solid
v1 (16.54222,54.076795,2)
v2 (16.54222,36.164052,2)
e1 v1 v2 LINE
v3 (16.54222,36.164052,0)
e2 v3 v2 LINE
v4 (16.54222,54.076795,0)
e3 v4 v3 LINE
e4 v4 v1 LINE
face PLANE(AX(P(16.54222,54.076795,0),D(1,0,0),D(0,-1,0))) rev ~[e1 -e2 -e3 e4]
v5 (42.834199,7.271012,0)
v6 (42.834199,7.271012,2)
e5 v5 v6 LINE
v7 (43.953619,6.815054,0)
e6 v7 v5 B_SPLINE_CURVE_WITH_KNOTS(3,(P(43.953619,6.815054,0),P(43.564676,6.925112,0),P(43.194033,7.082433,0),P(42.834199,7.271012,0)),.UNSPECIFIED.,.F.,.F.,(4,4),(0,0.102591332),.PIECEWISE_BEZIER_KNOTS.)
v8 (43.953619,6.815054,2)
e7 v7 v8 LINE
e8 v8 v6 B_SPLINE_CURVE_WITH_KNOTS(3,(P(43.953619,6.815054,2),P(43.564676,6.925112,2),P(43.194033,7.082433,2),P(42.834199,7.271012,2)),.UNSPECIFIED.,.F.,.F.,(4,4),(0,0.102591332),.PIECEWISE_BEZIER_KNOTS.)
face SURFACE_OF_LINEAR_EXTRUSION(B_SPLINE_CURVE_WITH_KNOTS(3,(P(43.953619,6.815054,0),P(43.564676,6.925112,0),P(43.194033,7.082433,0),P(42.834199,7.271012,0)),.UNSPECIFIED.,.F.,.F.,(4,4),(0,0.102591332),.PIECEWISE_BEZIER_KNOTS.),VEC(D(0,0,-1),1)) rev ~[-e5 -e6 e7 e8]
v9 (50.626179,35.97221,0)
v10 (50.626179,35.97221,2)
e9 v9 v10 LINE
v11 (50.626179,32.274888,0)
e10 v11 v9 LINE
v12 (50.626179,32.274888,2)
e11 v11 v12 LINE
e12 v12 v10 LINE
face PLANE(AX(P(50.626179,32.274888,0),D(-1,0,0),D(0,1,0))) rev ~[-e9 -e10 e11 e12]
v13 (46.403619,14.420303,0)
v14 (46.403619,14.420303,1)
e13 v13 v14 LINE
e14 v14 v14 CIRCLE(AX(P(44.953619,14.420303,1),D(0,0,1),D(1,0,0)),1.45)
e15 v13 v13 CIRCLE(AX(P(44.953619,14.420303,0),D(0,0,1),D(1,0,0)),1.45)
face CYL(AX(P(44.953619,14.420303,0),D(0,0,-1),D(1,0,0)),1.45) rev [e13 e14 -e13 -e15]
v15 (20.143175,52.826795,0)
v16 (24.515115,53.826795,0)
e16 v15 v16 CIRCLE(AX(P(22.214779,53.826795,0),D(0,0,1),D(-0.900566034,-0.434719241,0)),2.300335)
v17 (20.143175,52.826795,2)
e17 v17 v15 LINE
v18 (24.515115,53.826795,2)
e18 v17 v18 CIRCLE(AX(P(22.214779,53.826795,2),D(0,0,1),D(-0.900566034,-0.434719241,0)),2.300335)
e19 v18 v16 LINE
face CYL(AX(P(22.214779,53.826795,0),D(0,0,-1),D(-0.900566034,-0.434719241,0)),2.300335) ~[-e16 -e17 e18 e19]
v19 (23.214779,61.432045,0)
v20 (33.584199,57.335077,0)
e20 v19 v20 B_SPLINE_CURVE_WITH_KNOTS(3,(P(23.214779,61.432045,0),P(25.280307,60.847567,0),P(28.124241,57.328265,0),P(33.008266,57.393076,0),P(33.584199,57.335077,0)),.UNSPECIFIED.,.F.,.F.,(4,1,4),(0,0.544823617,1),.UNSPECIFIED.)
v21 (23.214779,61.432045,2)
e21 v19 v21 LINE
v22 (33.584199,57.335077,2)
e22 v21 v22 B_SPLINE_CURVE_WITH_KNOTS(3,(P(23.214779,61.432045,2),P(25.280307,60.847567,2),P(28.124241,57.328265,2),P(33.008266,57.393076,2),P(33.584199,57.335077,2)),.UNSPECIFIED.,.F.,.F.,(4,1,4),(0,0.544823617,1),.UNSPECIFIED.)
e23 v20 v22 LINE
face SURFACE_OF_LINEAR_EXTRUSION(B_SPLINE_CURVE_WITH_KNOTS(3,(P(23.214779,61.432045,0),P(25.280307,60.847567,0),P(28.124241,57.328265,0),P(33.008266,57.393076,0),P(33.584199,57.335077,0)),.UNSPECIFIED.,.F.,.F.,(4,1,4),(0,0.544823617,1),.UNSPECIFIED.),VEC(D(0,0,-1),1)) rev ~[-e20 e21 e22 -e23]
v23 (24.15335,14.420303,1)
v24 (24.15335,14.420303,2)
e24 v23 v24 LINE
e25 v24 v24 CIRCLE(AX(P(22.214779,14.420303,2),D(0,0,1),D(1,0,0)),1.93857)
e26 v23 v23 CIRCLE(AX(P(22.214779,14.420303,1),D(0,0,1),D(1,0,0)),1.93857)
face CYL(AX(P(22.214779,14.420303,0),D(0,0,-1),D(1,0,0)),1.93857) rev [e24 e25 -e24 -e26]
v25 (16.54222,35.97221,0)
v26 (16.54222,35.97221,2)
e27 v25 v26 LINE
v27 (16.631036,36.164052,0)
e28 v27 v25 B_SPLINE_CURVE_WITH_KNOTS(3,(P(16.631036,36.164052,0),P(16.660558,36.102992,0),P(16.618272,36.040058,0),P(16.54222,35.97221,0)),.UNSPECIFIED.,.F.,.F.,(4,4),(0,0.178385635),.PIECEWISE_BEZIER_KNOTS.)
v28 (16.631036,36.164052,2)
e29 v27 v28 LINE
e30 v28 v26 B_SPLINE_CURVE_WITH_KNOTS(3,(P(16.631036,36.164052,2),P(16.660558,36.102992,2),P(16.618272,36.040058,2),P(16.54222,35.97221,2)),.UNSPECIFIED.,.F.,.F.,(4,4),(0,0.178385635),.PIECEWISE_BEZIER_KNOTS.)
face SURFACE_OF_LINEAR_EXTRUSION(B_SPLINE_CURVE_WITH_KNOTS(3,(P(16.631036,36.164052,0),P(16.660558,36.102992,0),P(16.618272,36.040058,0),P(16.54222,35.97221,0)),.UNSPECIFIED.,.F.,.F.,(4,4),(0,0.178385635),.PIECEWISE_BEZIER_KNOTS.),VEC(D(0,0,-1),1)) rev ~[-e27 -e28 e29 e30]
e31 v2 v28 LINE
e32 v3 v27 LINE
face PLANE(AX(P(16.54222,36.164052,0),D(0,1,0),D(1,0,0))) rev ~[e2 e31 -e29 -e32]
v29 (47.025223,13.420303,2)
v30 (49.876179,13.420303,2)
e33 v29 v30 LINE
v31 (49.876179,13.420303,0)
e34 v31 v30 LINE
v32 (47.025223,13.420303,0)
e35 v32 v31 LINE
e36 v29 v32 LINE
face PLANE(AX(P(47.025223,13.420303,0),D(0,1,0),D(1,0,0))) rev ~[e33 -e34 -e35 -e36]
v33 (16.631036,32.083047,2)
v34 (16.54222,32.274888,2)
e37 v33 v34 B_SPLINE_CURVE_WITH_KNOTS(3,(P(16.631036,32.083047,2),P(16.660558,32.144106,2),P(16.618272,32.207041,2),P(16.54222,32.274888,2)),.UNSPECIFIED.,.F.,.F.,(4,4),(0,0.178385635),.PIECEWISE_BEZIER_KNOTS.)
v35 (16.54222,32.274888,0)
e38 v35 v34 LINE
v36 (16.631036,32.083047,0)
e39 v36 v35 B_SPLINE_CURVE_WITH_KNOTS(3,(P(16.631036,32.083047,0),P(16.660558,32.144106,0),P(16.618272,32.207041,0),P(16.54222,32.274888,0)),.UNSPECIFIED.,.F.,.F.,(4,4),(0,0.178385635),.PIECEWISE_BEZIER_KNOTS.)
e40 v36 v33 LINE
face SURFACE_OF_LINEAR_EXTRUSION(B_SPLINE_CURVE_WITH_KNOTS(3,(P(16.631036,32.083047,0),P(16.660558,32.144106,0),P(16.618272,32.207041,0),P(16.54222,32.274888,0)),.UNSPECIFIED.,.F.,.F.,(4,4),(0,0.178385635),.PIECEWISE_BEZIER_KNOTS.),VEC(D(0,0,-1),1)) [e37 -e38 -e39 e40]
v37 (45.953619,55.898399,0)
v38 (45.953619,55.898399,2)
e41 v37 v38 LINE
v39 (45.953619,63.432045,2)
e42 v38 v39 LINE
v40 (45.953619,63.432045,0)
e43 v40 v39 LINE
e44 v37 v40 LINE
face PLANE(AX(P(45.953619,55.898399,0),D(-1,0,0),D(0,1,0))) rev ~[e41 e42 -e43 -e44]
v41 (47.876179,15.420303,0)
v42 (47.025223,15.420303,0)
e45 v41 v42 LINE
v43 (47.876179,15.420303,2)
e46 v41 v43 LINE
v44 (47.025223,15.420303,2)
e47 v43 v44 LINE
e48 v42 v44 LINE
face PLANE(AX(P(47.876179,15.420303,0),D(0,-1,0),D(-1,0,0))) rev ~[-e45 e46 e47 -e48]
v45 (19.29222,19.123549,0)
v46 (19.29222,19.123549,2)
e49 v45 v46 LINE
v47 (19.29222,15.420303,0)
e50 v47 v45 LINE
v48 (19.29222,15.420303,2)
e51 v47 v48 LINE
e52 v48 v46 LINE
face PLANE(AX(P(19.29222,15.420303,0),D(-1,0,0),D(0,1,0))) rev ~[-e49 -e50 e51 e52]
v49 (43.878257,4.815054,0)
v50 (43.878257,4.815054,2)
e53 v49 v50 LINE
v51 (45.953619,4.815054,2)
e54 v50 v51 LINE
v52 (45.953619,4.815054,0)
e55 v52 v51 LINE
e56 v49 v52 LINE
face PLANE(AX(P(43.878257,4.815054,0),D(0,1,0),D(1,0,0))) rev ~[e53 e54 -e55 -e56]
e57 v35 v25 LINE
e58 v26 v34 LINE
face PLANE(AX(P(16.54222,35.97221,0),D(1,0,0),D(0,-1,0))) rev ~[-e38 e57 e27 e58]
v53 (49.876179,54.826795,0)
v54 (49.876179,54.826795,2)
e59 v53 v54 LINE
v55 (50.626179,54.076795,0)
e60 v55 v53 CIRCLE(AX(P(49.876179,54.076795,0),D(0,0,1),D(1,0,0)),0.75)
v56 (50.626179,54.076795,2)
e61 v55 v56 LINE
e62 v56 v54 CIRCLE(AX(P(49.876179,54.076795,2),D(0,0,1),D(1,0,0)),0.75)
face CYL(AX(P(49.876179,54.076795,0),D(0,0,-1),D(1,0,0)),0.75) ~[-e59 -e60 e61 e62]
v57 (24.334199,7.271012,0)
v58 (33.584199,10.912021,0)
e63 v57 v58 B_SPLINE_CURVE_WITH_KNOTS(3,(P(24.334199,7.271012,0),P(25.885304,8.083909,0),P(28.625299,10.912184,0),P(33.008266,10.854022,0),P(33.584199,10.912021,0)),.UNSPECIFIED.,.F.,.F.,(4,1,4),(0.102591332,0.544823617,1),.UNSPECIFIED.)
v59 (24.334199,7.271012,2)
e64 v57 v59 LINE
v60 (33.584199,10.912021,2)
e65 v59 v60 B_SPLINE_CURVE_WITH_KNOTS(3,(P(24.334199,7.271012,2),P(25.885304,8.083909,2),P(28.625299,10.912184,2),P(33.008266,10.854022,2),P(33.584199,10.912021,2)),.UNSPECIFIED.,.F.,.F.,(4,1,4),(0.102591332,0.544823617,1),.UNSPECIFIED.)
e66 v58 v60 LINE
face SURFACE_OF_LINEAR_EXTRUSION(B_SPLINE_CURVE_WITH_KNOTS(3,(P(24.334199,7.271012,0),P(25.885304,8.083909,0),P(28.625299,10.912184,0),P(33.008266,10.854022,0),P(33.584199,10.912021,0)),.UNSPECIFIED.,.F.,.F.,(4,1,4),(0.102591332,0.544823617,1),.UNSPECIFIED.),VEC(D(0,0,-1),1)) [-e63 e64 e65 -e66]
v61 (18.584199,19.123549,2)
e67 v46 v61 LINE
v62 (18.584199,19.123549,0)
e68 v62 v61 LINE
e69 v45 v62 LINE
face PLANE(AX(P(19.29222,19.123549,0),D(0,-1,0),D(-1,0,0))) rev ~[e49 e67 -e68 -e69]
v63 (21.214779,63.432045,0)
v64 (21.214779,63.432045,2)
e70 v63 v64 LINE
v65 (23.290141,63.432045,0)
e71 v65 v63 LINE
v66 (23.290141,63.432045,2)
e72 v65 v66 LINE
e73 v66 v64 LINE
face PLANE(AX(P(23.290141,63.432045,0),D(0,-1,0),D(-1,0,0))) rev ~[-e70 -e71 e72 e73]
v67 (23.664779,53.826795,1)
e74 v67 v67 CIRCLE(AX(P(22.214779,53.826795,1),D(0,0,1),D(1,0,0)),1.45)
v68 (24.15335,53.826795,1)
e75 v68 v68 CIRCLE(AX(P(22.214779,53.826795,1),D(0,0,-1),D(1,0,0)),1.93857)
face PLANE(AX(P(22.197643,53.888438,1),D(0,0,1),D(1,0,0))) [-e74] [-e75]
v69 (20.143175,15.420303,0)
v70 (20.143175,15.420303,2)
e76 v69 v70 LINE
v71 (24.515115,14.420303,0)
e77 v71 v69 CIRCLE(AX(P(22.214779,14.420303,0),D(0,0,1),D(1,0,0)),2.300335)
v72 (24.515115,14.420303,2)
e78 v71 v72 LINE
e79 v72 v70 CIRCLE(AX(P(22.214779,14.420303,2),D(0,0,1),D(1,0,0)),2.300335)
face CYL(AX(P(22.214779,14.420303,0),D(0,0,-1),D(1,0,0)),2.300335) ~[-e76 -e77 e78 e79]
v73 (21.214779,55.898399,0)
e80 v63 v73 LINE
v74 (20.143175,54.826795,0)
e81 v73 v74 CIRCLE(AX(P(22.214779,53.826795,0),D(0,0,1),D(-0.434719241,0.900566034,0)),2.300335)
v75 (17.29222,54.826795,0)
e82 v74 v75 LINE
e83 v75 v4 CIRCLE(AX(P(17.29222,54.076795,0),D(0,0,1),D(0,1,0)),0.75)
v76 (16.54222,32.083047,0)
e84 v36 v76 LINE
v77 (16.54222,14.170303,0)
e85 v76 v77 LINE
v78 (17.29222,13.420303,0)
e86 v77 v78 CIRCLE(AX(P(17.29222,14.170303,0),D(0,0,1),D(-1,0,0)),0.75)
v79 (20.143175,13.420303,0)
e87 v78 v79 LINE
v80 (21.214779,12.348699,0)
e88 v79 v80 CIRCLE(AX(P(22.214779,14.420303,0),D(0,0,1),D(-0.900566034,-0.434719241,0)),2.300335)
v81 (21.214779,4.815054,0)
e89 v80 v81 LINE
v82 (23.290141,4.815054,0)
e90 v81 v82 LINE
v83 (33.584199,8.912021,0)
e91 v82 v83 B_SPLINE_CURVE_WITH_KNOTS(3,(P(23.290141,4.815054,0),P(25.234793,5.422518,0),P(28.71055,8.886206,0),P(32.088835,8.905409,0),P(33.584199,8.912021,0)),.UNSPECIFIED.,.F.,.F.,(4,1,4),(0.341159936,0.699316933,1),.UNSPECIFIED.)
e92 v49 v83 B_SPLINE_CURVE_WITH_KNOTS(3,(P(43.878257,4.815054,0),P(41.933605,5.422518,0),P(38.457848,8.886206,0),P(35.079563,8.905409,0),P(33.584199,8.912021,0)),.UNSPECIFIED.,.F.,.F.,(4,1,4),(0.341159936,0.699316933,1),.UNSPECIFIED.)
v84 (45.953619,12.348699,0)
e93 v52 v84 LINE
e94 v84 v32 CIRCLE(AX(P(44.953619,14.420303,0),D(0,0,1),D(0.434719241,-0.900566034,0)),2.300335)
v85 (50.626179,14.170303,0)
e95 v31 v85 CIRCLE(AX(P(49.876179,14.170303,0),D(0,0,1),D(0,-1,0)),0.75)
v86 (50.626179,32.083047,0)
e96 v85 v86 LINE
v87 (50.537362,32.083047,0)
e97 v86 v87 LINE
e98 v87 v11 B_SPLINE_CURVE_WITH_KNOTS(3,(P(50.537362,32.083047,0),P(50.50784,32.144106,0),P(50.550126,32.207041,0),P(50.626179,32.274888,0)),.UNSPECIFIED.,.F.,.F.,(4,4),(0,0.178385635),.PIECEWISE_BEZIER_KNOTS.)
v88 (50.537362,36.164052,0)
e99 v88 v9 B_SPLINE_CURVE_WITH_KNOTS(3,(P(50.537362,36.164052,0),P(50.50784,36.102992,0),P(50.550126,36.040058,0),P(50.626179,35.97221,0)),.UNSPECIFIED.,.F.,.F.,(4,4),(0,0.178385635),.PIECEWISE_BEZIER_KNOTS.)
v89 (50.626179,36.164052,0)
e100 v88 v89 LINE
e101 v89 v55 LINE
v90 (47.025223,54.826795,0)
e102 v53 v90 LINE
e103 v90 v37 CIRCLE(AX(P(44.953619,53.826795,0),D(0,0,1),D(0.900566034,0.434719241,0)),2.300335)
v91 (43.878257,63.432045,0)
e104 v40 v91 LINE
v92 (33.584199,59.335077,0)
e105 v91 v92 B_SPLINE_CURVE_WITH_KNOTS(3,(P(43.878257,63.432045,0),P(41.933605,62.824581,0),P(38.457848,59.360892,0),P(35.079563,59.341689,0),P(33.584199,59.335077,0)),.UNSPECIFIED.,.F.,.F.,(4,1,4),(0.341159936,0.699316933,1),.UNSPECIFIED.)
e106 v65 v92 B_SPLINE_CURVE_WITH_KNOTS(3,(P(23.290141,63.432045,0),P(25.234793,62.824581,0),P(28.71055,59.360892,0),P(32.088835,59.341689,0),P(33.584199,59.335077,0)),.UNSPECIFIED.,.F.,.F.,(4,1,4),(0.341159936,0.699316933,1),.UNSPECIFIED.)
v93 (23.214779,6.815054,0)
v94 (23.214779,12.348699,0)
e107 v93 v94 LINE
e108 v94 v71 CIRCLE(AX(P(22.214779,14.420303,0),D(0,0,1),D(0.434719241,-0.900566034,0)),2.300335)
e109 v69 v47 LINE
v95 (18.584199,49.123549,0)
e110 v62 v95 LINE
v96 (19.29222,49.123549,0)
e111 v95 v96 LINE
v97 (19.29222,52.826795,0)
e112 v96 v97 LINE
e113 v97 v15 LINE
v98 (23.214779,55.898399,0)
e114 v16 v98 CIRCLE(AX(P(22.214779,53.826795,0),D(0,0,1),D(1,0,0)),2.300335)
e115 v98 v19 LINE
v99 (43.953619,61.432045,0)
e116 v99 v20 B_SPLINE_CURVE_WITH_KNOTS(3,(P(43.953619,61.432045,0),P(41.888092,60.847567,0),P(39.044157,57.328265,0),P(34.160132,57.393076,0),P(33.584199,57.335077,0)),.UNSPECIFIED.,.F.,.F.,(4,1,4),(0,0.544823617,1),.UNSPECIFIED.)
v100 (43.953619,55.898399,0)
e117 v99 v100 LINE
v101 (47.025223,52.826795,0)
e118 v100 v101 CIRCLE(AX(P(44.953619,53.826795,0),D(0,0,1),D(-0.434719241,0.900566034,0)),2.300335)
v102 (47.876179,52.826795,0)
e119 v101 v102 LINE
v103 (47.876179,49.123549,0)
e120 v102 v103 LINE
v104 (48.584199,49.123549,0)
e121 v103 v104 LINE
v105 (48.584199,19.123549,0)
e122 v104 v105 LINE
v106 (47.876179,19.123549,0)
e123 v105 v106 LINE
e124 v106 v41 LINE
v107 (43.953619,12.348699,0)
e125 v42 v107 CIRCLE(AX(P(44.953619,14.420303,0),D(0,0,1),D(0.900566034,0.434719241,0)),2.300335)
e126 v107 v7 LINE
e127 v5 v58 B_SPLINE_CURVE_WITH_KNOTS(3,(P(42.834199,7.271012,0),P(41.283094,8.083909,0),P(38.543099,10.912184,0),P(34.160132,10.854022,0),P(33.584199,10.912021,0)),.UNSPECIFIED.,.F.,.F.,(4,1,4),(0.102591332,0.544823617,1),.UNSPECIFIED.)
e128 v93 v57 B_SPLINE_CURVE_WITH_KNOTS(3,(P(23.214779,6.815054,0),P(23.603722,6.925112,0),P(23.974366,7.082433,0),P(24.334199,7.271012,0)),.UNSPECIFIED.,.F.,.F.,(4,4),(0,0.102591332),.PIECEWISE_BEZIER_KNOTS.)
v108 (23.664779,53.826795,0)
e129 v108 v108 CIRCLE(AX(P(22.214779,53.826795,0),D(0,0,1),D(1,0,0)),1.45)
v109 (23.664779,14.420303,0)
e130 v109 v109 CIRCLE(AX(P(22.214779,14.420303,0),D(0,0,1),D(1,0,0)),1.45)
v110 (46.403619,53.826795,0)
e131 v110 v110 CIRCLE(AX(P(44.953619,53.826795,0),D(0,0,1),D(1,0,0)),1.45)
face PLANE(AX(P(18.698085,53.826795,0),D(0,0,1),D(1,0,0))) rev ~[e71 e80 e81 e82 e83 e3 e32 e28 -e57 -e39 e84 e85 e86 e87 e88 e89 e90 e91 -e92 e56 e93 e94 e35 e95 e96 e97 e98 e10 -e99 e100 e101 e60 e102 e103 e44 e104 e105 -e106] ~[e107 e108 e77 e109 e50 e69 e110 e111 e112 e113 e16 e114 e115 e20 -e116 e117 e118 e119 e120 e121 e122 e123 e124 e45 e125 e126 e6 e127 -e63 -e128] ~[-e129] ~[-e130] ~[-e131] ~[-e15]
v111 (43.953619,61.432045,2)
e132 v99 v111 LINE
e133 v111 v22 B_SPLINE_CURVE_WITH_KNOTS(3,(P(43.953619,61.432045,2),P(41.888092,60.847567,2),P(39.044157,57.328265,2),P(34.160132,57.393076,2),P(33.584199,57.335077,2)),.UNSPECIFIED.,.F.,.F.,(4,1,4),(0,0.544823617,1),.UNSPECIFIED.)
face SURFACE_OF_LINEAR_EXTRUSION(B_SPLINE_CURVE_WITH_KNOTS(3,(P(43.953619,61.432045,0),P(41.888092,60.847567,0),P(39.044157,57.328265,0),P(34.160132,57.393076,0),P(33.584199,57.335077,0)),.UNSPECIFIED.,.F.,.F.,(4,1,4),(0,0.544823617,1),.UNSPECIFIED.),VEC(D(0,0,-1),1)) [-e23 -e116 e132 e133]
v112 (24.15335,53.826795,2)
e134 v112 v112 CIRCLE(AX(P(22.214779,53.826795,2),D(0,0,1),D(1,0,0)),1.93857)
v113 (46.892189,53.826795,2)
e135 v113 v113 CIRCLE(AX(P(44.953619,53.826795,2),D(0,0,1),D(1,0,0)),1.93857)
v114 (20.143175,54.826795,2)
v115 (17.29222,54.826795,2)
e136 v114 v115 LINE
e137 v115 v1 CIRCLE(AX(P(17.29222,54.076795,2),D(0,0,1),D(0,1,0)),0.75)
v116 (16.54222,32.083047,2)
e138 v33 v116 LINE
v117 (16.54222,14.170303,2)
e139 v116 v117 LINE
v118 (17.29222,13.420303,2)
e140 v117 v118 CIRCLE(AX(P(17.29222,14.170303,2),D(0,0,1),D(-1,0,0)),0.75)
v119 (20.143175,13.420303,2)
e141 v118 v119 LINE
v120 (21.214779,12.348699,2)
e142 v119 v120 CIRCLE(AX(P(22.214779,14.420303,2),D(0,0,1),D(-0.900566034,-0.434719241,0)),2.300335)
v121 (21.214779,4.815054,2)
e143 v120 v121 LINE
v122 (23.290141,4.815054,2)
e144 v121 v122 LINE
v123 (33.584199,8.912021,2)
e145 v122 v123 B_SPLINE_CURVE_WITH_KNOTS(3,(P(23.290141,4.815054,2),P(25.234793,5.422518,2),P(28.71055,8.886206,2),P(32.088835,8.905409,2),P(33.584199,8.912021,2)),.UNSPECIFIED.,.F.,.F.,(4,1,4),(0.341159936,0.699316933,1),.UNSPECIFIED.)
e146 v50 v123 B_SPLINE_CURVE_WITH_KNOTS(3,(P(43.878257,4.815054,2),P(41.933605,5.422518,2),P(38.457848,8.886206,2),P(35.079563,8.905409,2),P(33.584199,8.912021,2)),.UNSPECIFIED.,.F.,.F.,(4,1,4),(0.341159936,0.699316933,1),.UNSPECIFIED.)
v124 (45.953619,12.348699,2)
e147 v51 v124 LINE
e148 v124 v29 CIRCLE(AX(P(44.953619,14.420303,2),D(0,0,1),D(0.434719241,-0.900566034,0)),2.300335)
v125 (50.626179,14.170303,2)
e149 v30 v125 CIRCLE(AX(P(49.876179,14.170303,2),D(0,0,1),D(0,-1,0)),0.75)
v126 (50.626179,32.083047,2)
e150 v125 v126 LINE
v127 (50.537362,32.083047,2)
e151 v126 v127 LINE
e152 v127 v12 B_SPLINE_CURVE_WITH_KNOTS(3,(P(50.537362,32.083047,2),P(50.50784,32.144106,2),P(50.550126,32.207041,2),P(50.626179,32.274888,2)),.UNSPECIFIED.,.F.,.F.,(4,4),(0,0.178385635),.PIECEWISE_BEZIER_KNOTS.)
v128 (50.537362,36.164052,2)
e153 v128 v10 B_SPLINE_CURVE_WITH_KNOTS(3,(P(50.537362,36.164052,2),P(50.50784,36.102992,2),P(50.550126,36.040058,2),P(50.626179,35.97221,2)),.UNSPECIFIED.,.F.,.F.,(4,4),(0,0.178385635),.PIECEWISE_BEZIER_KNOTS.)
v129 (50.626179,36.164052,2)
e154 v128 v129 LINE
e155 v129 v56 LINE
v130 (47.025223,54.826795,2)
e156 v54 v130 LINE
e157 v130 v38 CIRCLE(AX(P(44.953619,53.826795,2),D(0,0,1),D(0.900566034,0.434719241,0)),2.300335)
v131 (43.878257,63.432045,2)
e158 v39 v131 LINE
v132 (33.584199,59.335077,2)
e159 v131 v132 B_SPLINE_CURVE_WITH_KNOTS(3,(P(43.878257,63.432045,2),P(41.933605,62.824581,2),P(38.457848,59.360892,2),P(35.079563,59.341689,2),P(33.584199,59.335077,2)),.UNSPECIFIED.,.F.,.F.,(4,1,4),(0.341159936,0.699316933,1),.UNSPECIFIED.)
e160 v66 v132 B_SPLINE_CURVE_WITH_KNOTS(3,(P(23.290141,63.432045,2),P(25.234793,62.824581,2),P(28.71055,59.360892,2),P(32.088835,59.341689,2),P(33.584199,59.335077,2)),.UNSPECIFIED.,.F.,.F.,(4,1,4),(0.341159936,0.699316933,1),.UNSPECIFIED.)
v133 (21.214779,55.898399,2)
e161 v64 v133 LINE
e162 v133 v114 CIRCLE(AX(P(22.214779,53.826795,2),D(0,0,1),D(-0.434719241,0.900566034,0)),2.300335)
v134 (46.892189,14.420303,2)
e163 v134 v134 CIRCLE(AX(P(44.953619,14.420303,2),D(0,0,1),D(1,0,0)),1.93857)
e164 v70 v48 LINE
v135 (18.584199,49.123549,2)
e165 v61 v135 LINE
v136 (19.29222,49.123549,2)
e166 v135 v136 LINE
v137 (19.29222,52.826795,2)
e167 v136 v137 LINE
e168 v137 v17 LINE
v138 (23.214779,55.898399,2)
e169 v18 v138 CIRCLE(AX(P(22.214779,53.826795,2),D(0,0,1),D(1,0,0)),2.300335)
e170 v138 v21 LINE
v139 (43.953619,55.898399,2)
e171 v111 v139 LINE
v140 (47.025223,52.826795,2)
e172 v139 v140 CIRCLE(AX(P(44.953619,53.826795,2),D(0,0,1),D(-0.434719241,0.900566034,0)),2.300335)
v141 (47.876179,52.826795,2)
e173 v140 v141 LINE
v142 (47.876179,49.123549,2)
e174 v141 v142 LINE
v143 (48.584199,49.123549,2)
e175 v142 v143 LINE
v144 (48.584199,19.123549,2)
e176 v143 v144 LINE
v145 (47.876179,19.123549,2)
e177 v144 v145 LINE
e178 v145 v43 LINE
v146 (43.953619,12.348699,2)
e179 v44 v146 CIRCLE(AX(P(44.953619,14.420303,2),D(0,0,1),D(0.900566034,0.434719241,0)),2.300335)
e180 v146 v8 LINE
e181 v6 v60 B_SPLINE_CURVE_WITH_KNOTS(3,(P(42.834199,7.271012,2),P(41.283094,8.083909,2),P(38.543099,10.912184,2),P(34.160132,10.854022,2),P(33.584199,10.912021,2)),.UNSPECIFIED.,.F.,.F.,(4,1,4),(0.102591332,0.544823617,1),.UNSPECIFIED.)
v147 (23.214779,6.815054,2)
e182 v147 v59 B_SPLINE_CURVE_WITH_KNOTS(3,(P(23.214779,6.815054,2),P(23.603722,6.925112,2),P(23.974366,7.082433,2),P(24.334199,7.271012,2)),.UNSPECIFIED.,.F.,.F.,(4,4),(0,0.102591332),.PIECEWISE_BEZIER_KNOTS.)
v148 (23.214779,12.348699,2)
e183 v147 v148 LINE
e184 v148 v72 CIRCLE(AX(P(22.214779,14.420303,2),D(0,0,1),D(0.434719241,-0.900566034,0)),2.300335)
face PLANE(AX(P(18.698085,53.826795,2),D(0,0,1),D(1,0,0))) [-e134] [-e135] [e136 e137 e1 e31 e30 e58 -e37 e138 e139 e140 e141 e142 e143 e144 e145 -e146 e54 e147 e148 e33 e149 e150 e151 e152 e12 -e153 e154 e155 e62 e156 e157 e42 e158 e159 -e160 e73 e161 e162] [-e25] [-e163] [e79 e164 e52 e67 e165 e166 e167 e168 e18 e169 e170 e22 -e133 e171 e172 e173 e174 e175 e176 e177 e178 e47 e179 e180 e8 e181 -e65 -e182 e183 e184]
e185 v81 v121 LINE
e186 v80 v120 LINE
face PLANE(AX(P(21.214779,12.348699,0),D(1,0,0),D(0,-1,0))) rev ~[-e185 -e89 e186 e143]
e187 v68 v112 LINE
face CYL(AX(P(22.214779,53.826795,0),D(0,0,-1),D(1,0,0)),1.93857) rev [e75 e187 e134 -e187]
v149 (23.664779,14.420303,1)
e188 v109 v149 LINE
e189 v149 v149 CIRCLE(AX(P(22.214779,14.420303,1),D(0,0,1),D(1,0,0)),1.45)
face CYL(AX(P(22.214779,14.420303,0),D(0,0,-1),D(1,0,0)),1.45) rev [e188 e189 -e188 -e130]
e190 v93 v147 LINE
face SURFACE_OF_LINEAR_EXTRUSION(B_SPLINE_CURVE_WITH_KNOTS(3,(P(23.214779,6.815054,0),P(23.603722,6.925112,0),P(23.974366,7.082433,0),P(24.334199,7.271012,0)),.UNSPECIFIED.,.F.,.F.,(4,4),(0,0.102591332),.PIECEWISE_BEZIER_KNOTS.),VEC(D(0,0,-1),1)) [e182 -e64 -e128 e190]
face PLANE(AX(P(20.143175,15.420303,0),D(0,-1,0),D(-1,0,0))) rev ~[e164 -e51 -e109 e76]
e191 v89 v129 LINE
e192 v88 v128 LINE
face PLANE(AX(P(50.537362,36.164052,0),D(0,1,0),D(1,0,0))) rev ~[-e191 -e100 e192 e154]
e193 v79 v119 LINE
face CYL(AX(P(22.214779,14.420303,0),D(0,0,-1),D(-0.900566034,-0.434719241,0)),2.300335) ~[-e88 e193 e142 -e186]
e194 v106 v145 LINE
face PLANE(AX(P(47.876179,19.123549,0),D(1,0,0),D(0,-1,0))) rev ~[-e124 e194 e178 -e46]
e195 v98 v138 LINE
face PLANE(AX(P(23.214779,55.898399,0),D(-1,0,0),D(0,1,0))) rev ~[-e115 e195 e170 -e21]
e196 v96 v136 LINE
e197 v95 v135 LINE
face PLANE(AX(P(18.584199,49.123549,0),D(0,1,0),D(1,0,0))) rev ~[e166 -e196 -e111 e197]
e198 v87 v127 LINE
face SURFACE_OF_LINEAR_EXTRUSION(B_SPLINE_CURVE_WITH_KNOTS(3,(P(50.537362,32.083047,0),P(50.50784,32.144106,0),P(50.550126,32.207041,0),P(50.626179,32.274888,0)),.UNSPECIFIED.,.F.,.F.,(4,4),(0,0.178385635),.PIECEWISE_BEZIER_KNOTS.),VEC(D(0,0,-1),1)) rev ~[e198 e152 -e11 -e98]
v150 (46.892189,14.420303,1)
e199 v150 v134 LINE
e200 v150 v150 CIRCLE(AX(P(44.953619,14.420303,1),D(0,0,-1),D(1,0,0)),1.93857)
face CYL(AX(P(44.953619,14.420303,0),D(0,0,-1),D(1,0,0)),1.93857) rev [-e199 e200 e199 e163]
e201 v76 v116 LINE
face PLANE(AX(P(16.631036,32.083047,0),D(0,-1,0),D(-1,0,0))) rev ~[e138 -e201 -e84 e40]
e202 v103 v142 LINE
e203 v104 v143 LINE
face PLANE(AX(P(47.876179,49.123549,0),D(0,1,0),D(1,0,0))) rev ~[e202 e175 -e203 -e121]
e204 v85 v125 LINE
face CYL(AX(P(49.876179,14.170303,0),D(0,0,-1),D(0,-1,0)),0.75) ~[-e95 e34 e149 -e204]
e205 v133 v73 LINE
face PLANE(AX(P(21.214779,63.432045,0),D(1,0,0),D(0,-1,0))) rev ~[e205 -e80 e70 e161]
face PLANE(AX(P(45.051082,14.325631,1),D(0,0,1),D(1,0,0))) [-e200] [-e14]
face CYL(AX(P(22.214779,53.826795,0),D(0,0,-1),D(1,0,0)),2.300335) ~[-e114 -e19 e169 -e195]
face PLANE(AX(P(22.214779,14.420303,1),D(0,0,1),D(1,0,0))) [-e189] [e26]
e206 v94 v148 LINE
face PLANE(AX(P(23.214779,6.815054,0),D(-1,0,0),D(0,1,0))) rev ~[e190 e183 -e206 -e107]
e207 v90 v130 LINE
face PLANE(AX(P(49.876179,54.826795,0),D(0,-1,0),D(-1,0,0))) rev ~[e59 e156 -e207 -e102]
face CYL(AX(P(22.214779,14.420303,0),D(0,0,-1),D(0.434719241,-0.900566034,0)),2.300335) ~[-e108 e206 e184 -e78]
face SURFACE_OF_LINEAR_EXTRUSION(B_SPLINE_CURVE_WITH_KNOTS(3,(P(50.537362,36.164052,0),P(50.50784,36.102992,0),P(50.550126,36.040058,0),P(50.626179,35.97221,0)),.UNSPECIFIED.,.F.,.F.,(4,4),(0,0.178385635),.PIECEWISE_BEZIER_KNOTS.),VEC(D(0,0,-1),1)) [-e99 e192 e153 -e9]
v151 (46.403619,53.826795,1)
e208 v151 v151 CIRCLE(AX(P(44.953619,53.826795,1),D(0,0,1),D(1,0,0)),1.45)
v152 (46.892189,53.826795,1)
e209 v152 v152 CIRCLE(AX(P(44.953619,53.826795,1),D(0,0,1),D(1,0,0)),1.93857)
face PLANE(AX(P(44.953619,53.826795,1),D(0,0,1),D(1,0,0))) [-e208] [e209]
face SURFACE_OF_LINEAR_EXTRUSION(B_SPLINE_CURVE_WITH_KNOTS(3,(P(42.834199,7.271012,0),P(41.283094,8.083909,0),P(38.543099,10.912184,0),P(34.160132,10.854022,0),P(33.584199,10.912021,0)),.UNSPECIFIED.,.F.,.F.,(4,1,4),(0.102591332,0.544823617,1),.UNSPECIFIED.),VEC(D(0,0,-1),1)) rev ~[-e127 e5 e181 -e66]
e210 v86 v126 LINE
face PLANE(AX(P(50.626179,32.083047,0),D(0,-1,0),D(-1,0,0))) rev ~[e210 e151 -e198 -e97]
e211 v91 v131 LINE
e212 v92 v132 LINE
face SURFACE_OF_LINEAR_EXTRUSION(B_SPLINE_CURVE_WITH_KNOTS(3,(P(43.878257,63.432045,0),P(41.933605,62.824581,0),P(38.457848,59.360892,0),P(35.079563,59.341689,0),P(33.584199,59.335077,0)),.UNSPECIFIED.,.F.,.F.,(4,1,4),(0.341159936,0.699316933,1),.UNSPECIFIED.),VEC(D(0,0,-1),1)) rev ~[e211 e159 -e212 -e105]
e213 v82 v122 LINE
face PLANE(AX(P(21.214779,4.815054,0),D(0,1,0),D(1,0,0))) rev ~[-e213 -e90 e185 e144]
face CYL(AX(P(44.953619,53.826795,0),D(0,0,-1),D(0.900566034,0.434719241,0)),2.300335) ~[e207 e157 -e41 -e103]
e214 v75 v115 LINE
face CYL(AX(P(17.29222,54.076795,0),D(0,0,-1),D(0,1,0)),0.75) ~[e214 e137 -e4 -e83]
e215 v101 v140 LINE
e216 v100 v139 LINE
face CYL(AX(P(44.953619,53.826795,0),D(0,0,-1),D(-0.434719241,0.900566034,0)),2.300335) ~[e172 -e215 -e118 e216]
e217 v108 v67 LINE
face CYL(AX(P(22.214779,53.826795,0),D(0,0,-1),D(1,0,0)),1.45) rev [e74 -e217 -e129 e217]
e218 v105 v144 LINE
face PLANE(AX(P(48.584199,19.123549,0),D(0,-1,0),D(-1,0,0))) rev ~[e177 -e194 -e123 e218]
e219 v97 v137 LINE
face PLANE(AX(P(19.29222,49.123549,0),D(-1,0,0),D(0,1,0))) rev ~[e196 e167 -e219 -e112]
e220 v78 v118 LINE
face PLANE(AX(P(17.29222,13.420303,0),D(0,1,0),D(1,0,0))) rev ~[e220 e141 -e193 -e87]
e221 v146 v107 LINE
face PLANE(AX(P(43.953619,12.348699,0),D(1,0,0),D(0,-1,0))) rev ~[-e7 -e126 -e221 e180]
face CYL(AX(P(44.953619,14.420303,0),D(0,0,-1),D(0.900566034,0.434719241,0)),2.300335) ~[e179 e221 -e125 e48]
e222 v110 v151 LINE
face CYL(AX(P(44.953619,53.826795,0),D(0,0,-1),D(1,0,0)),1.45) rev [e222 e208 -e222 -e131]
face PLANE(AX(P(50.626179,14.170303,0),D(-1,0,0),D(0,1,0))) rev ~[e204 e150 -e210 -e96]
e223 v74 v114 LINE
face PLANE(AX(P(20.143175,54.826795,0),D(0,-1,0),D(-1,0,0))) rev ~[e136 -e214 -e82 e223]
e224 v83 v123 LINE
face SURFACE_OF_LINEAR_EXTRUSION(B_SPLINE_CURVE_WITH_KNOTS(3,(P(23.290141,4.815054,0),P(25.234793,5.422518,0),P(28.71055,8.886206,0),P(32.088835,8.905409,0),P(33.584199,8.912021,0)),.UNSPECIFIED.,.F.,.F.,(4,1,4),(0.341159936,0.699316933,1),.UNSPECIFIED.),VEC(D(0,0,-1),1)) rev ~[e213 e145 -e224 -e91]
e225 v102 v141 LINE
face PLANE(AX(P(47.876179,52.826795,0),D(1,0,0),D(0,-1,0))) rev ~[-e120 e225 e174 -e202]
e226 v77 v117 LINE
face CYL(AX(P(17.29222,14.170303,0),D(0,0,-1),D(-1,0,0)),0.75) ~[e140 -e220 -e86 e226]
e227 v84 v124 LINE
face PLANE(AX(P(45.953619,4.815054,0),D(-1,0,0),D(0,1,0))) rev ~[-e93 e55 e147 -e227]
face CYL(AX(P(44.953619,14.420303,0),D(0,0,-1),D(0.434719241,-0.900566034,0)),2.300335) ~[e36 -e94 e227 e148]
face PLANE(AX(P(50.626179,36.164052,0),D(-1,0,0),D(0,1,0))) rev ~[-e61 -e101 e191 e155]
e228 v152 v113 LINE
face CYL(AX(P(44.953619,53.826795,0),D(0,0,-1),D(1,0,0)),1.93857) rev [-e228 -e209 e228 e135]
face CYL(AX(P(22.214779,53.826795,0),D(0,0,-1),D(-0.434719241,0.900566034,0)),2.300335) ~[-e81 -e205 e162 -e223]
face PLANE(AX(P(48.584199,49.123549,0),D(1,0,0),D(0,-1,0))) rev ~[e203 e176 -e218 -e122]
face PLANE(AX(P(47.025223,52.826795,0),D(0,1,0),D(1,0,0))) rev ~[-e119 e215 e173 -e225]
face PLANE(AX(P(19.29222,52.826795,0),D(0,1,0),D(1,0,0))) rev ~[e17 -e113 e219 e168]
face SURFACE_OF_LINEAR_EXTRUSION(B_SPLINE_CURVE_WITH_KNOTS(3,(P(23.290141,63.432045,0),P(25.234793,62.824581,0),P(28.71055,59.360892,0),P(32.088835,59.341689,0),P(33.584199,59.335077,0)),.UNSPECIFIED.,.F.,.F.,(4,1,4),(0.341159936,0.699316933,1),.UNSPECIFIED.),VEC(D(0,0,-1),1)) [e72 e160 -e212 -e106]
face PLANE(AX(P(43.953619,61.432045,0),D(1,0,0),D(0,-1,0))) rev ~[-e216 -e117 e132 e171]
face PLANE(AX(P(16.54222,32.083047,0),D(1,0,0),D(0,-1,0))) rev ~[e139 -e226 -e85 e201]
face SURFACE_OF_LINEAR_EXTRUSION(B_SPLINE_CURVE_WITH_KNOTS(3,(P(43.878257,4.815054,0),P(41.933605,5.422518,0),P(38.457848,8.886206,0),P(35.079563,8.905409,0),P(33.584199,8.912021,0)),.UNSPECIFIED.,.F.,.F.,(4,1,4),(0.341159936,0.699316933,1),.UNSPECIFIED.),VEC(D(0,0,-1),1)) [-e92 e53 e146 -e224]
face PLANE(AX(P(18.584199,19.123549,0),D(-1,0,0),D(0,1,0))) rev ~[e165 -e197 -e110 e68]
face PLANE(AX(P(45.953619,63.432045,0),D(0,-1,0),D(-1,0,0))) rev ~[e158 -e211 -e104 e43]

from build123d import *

# Parameters (mm, degrees)
F1_R     = 1.9385702654
F2_DEPTH = 2
F1_R_2   = 1.45
F3_DEPTH = 1


# Not quite as in the source:
# - a feature names something its author has since deleted; it is built from what else it names


with BuildPart() as f2:
    # F1 (on Top) → F2 (new body)
    with BuildSketch(Plane.XY):
        with BuildLine():
            Line((20.1431754695, 54.826795375), (17.2922195872, 54.826795375))
            Line((17.2922195872, 54.826795375), (17.2922195872, 52.826795375))
            Line((17.2922195872, 52.826795375), (19.2922195872, 52.826795375))
            Line((19.2922195872, 52.826795375), (20.1431754695, 52.826795375))
            ThreePointArc((20.1431754695, 52.826795375), (19.9144440108, 53.826795375), (20.1431754695, 54.826795375))
        make_face()
        with BuildLine():
            Line((17.2922195872, 52.826795375), (17.2922195872, 54.826795375))
            ThreePointArc((17.2922195872, 54.826795375), (16.7618895013, 54.6071254609), (16.5422195872, 54.076795375))
            Line((16.5422195872, 54.076795375), (16.5422195872, 36.1640515577))
            Line((16.5422195872, 36.1640515577), (16.6310362357, 36.1640515577))
            add(Edge.make_bspline(
                [(16.6310362357, 36.1640515577), (16.6605582728, 36.102992123), (16.6182720198, 36.0400576616), (16.5422195872, 35.9722101398)],
                knots=[0, 0, 0, 0, 0.1783856354, 0.1783856354, 0.1783856354, 0.1783856354], degree=3))
            Line((16.5422195872, 35.9722101398), (16.5422195872, 34.8729174655))
            add(Edge.make_bspline(
                [(17.2922195872, 35.0191108741), (17.0997972988, 34.9422994833), (16.8549828965, 34.8916378751), (16.5422195872, 34.8729174655)],
                knots=[0.8658058325, 0.8658058325, 0.8658058325, 0.8658058325, 0.9922819661, 0.9922819661, 0.9922819661, 0.9922819661], degree=3))
            Line((17.2922195872, 35.0191108741), (17.2922195872, 38.9486732266))
            Line((17.2922195872, 38.9486732266), (17.2922195872, 52.826795375))
        make_face()
        with BuildLine():
            add(Edge.make_bspline(
                [(23.2901408764, 63.432044637), (25.2347933568, 62.8245805128), (28.7105504794, 59.3608919111), (32.0888348452, 59.3416892775), (33.5841990847, 59.3350770114)],
                knots=[0.341159936, 0.341159936, 0.341159936, 0.341159936, 0.6993169326, 1, 1, 1, 1], degree=3))
            Line((23.2901408764, 63.432044637), (23.214779273, 63.432044637))
            Line((23.214779273, 63.432044637), (23.214779273, 61.432044637))
            add(Edge.make_bspline(
                [(23.214779273, 61.432044637), (25.2803065411, 60.8475667943), (28.1242407781, 57.3282649057), (33.0082662404, 57.3930760622), (33.5841990847, 57.3350770114)],
                knots=[0, 0, 0, 0, 0.5448236167, 1, 1, 1, 1], degree=3))
            Line((33.5841990847, 57.3350770114), (33.5841990847, 59.3350770114))
        make_face()
        with BuildLine():
            Line((19.2922195872, 52.826795375), (17.2922195872, 52.826795375))
            Line((17.2922195872, 52.826795375), (17.2922195872, 38.9486732266))
            add(Edge.make_bspline(
                [(17.2922195872, 38.9486732266), (17.9578883588, 37.6855991358), (18.2133900062, 36.1544678124), (17.7506952192, 35.2021258003), (17.2922195872, 35.0191108741)],
                knots=[0, 0, 0, 0, 0.5644570346, 0.8658058325, 0.8658058325, 0.8658058325, 0.8658058325], degree=3))
            Line((17.2922195872, 35.0191108741), (17.2922195872, 34.1235491752))
            Line((17.2922195872, 34.1235491752), (18.5841990847, 34.1235491752))
            Line((18.5841990847, 34.1235491752), (18.5841990847, 49.1235491752))
            Line((18.5841990847, 49.1235491752), (19.2922195872, 49.1235491752))
            Line((19.2922195872, 49.1235491752), (19.2922195872, 52.826795375))
        make_face()
        with BuildLine():
            ThreePointArc((21.214779273, 55.8983991785), (20.5881966101, 55.4533780379), (20.1431754695, 54.826795375))
            ThreePointArc((20.1431754695, 54.826795375), (19.9144440108, 53.826795375), (20.1431754695, 52.826795375))
            ThreePointArc((20.1431754695, 52.826795375), (22.7276920531, 51.5843719542), (24.5151145351, 53.826795375))
            ThreePointArc((24.5151145351, 53.826795375), (24.1630961851, 55.0497440772), (23.214779273, 55.8983991785))
            ThreePointArc((23.214779273, 55.8983991785), (22.214779273, 56.1271306372), (21.214779273, 55.8983991785))
        make_face()
        with Locations((22.214779273, 53.826795375)):
            Circle(F1_R, mode=Mode.SUBTRACT)
        with BuildLine():
            Line((23.214779273, 63.432044637), (21.214779273, 63.432044637))
            Line((21.214779273, 63.432044637), (21.214779273, 55.8983991785))
            ThreePointArc((21.214779273, 55.8983991785), (22.214779273, 56.1271306372), (23.214779273, 55.8983991785))
            Line((23.214779273, 55.8983991785), (23.214779273, 61.432044637))
            Line((23.214779273, 61.432044637), (23.214779273, 63.432044637))
        make_face()
        with BuildLine():
            add(Edge.make_bspline(
                [(43.8782572929, 63.432044637), (41.9336048125, 62.8245805128), (38.4578476899, 59.3608919111), (35.0795633241, 59.3416892775), (33.5841990847, 59.3350770114)],
                knots=[0.341159936, 0.341159936, 0.341159936, 0.341159936, 0.6993169326, 1, 1, 1, 1], degree=3))
            Line((33.5841990847, 59.3350770114), (33.5841990847, 57.3350770114))
            add(Edge.make_bspline(
                [(43.9536188964, 61.432044637), (41.8880916283, 60.8475667943), (39.0441573912, 57.3282649057), (34.160131929, 57.3930760622), (33.5841990847, 57.3350770114)],
                knots=[0, 0, 0, 0, 0.5448236167, 1, 1, 1, 1], degree=3))
            Line((43.9536188964, 61.432044637), (43.9536188964, 63.432044637))
            Line((43.9536188964, 63.432044637), (43.8782572929, 63.432044637))
        make_face()
        with BuildLine():
            add(Edge.make_bspline(
                [(17.2922195872, 38.9486732266), (17.9578883588, 37.6855991358), (18.2133900062, 36.1544678124), (17.7506952192, 35.2021258003), (17.2922195872, 35.0191108741)],
                knots=[0, 0, 0, 0, 0.5644570346, 0.8658058325, 0.8658058325, 0.8658058325, 0.8658058325], degree=3))
            Line((17.2922195872, 38.9486732266), (17.2922195872, 35.0191108741))
        make_face()
        with BuildLine():
            Line((17.2922195872, 34.1235491752), (17.2922195872, 35.0191108741))
            add(Edge.make_bspline(
                [(17.2922195872, 35.0191108741), (17.0997972988, 34.9422994833), (16.8549828965, 34.8916378751), (16.5422195872, 34.8729174655)],
                knots=[0.8658058325, 0.8658058325, 0.8658058325, 0.8658058325, 0.9922819661, 0.9922819661, 0.9922819661, 0.9922819661], degree=3))
            Line((16.5422195872, 34.8729174655), (16.5422195872, 34.1235491752))
            Line((16.5422195872, 34.1235491752), (17.2922195872, 34.1235491752))
        make_face()
        with BuildLine():
            Line((45.9536188964, 63.432044637), (43.9536188964, 63.432044637))
            Line((43.9536188964, 63.432044637), (43.9536188964, 61.432044637))
            Line((43.9536188964, 61.432044637), (43.9536188964, 55.8983991785))
            ThreePointArc((43.9536188964, 55.8983991785), (44.9536188964, 56.1271306372), (45.9536188964, 55.8983991785))
            Line((45.9536188964, 55.8983991785), (45.9536188964, 63.432044637))
        make_face()
        with BuildLine():
            Line((17.2922195872, 33.2279874763), (17.2922195872, 34.1235491752))
            Line((17.2922195872, 34.1235491752), (16.5422195872, 34.1235491752))
            Line((16.5422195872, 34.1235491752), (16.5422195872, 33.3741808849))
            add(Edge.make_bspline(
                [(17.2922195872, 33.2279874763), (17.0997972989, 33.304798867), (16.8549828965, 33.3554604753), (16.5422195872, 33.3741808849)],
                knots=[0.8658058325, 0.8658058325, 0.8658058325, 0.8658058325, 0.9922819661, 0.9922819661, 0.9922819661, 0.9922819661], degree=3))
        make_face()
        with BuildLine():
            Line((18.5841990847, 34.1235491752), (17.2922195872, 34.1235491752))
            Line((17.2922195872, 34.1235491752), (17.2922195872, 33.2279874763))
            add(Edge.make_bspline(
                [(17.2922195872, 29.2984251514), (17.9578883575, 30.5614992398), (18.213390004, 32.092630538), (17.7506952207, 33.0449725495), (17.2922195872, 33.2279874763)],
                knots=[0, 0, 0, 0, 0.5644570335, 0.8658058325, 0.8658058325, 0.8658058325, 0.8658058325], degree=3))
            Line((17.2922195872, 29.2984251514), (17.2922195872, 15.4203029754))
            Line((17.2922195872, 15.4203029754), (19.2922195872, 15.4203029754))
            Line((19.2922195872, 15.4203029754), (19.2922195872, 19.1235491752))
            Line((19.2922195872, 19.1235491752), (18.5841990847, 19.1235491752))
            Line((18.5841990847, 19.1235491752), (18.5841990847, 34.1235491752))
        make_face()
        with BuildLine():
            Line((47.8761785822, 52.826795375), (47.8761785822, 49.1235491752))
            Line((47.8761785822, 49.1235491752), (48.5841990847, 49.1235491752))
            Line((48.5841990847, 49.1235491752), (48.5841990847, 34.1235491752))
            Line((48.5841990847, 34.1235491752), (49.8755873878, 34.1235491752))
            Line((49.8755873878, 34.1235491752), (49.8755873878, 35.0193505084))
            add(Edge.make_bspline(
                [(49.8755873878, 38.9486732266), (49.2099248299, 37.685610926), (48.955176546, 36.1546772336), (49.4175949717, 35.2024133246), (49.8755873878, 35.0193505084)],
                knots=[0, 0, 0, 0, 0.5644517657, 0.8656719041, 0.8656719041, 0.8656719041, 0.8656719041], degree=3))
            Line((49.8755873878, 38.9486732266), (49.8755873878, 52.826795375))
            Line((49.8755873878, 52.826795375), (47.8761785822, 52.826795375))
        make_face()
        with BuildLine():
            ThreePointArc((45.9536188964, 55.8983991785), (44.9536188964, 56.1271306372), (43.9536188964, 55.8983991785))
            ThreePointArc((43.9536188964, 55.8983991785), (43.3270362335, 52.2002127122), (47.0252226998, 52.826795375))
            ThreePointArc((47.0252226998, 52.826795375), (47.1960423172, 53.3138825949), (47.2539541585, 53.826795375))
            ThreePointArc((47.2539541585, 53.826795375), (47.1960423172, 54.3397081552), (47.0252226998, 54.826795375))
            ThreePointArc((47.0252226998, 54.826795375), (46.5802015593, 55.4533780379), (45.9536188964, 55.8983991785))
        make_face()
        with Locations((44.9536188964, 53.826795375)):
            Circle(F1_R, mode=Mode.SUBTRACT)
        with BuildLine():
            Line((17.2922195872, 29.2984251514), (17.2922195872, 33.2279874763))
            add(Edge.make_bspline(
                [(17.2922195872, 33.2279874763), (17.0997972989, 33.304798867), (16.8549828965, 33.3554604753), (16.5422195872, 33.3741808849)],
                knots=[0.8658058325, 0.8658058325, 0.8658058325, 0.8658058325, 0.9922819661, 0.9922819661, 0.9922819661, 0.9922819661], degree=3))
            Line((16.5422195872, 33.3741808849), (16.5422195872, 32.2748882106))
            add(Edge.make_bspline(
                [(16.6310362357, 32.0830467928), (16.6605582728, 32.1441062274), (16.6182720198, 32.2070406889), (16.5422195872, 32.2748882106)],
                knots=[0, 0, 0, 0, 0.1783856354, 0.1783856354, 0.1783856354, 0.1783856354], degree=3))
            Line((16.6310362357, 32.0830467928), (16.5422195872, 32.0830467928))
            Line((16.5422195872, 32.0830467928), (16.5422195872, 14.1703029754))
            ThreePointArc((16.5422195872, 14.1703029754), (16.7618895013, 13.6399728895), (17.2922195872, 13.4203029754))
            Line((17.2922195872, 13.4203029754), (17.2922195872, 14.4203029754))
            Line((17.2922195872, 14.4203029754), (17.2922195872, 15.4203029754))
            Line((17.2922195872, 15.4203029754), (17.2922195872, 29.2984251514))
        make_face()
        with BuildLine():
            add(Edge.make_bspline(
                [(17.2922195872, 29.2984251514), (17.9578883575, 30.5614992398), (18.213390004, 32.092630538), (17.7506952207, 33.0449725495), (17.2922195872, 33.2279874763)],
                knots=[0, 0, 0, 0, 0.5644570335, 0.8658058325, 0.8658058325, 0.8658058325, 0.8658058325], degree=3))
            Line((17.2922195872, 33.2279874763), (17.2922195872, 29.2984251514))
        make_face()
        with BuildLine():
            Line((49.8755873878, 34.1235491752), (48.5841990847, 34.1235491752))
            Line((48.5841990847, 34.1235491752), (48.5841990847, 19.1235491752))
            Line((48.5841990847, 19.1235491752), (47.8761785822, 19.1235491752))
            Line((47.8761785822, 19.1235491752), (47.8761785822, 15.4203029754))
            Line((47.8761785822, 15.4203029754), (49.8755873878, 15.4203029754))
            Line((49.8755873878, 15.4203029754), (49.8755873878, 29.2984251238))
            add(Edge.make_bspline(
                [(49.8755873878, 29.2984251238), (49.2099248299, 30.5614874244), (48.955176546, 32.0924211168), (49.4175949717, 33.0446850258), (49.8755873878, 33.227747842)],
                knots=[0, 0, 0, 0, 0.5644517657, 0.8656719041, 0.8656719041, 0.8656719041, 0.8656719041], degree=3))
            Line((49.8755873878, 33.227747842), (49.8755873878, 34.1235491752))
        make_face()
        with BuildLine():
            Line((47.0252226998, 52.826795375), (47.8761785822, 52.826795375))
            Line((47.8761785822, 52.826795375), (49.8755873878, 52.826795375))
            Line((49.8755873878, 52.826795375), (49.8755873878, 54.826795375))
            Line((49.8755873878, 54.826795375), (47.0252226998, 54.826795375))
            ThreePointArc((47.0252226998, 54.826795375), (47.1960423172, 54.3397081552), (47.2539541585, 53.826795375))
            ThreePointArc((47.2539541585, 53.826795375), (47.1960423172, 53.3138825949), (47.0252226998, 52.826795375))
        make_face()
        with BuildLine():
            Line((49.8761785822, 54.826795375), (49.8755873878, 54.826795375))
            Line((49.8755873878, 54.826795375), (49.8755873878, 52.826795375))
            Line((49.8755873878, 52.826795375), (49.8755873878, 38.9486732266))
            Line((49.8755873878, 38.9486732266), (49.8755873878, 35.0193505084))
            add(Edge.make_bspline(
                [(49.8755873878, 35.0193505084), (50.068092586, 34.9424048157), (50.3130851315, 34.891657493), (50.6261785822, 34.8729174529)],
                knots=[0.8656719041, 0.8656719041, 0.8656719041, 0.8656719041, 0.9922819536, 0.9922819536, 0.9922819536, 0.9922819536], degree=3))
            Line((50.6261785822, 34.8729174529), (50.6261785822, 35.9722101398))
            add(Edge.make_bspline(
                [(50.5373619336, 36.1640515577), (50.5078398965, 36.102992123), (50.5501261495, 36.0400576616), (50.6261785822, 35.9722101398)],
                knots=[0, 0, 0, 0, 0.1783856354, 0.1783856354, 0.1783856354, 0.1783856354], degree=3))
            Line((50.5373619336, 36.1640515577), (50.6261785822, 36.1640515577))
            Line((50.6261785822, 36.1640515577), (50.6261785822, 54.076795375))
            ThreePointArc((50.6261785822, 54.076795375), (50.406508668, 54.6071254609), (49.8761785822, 54.826795375))
        make_face()
        with BuildLine():
            add(Edge.make_bspline(
                [(42.8341990846, 7.271012371), (41.2830937007, 8.0839085723), (38.5430987116, 10.9121843818), (34.160131929, 10.8540222882), (33.5841990847, 10.912021339)],
                knots=[0.1025913324, 0.1025913324, 0.1025913324, 0.1025913324, 0.5448236167, 1, 1, 1, 1], degree=3))
            Line((33.5841990847, 10.912021339), (33.5841990847, 8.912021339))
            add(Edge.make_bspline(
                [(43.8782572929, 4.8150537134), (41.9336048125, 5.4225178376), (38.4578476899, 8.8862064393), (35.0795633241, 8.9054090729), (33.5841990847, 8.912021339)],
                knots=[0.341159936, 0.341159936, 0.341159936, 0.341159936, 0.6993169326, 1, 1, 1, 1], degree=3))
            Line((43.8782572929, 4.8150537134), (43.9536188964, 4.8150537134))
            Line((43.9536188964, 4.8150537134), (43.9536188964, 6.8150537134))
            add(Edge.make_bspline(
                [(43.9536188964, 6.8150537134), (43.5646761486, 6.9251120127), (43.1940325333, 7.0824325062), (42.8341990846, 7.271012371)],
                knots=[0, 0, 0, 0, 0.1025913324, 0.1025913324, 0.1025913324, 0.1025913324], degree=3))
        make_face()
        with BuildLine():
            Line((33.5841990847, 8.912021339), (33.5841990847, 10.912021339))
            add(Edge.make_bspline(
                [(24.3341990847, 7.271012371), (25.8853044686, 8.0839085723), (28.6252994577, 10.9121843818), (33.0082662404, 10.8540222882), (33.5841990847, 10.912021339)],
                knots=[0.1025913324, 0.1025913324, 0.1025913324, 0.1025913324, 0.5448236167, 1, 1, 1, 1], degree=3))
            add(Edge.make_bspline(
                [(23.214779273, 6.8150537134), (23.6037220207, 6.9251120127), (23.974365636, 7.0824325062), (24.3341990847, 7.271012371)],
                knots=[0, 0, 0, 0, 0.1025913324, 0.1025913324, 0.1025913324, 0.1025913324], degree=3))
            Line((23.214779273, 6.8150537134), (23.214779273, 4.8150537134))
            Line((23.214779273, 4.8150537134), (23.2901408764, 4.8150537134))
            add(Edge.make_bspline(
                [(23.2901408764, 4.8150537134), (25.2347933568, 5.4225178376), (28.7105504794, 8.8862064393), (32.0888348452, 8.9054090729), (33.5841990847, 8.912021339)],
                knots=[0.341159936, 0.341159936, 0.341159936, 0.341159936, 0.6993169326, 1, 1, 1, 1], degree=3))
        make_face()
        with BuildLine():
            Line((49.8755873878, 35.0193505084), (49.8755873878, 34.1235491752))
            Line((49.8755873878, 34.1235491752), (50.6261785822, 34.1235491752))
            Line((50.6261785822, 34.1235491752), (50.6261785822, 34.8729174529))
            add(Edge.make_bspline(
                [(49.8755873878, 35.0193505084), (50.068092586, 34.9424048157), (50.3130851315, 34.891657493), (50.6261785822, 34.8729174529)],
                knots=[0.8656719041, 0.8656719041, 0.8656719041, 0.8656719041, 0.9922819536, 0.9922819536, 0.9922819536, 0.9922819536], degree=3))
        make_face()
        with BuildLine():
            Line((50.6261785822, 34.1235491752), (49.8755873878, 34.1235491752))
            Line((49.8755873878, 34.1235491752), (49.8755873878, 33.227747842))
            add(Edge.make_bspline(
                [(49.8755873878, 33.227747842), (50.068092586, 33.3046935347), (50.3130851315, 33.3554408575), (50.6261785822, 33.3741808975)],
                knots=[0.8656719041, 0.8656719041, 0.8656719041, 0.8656719041, 0.9922819536, 0.9922819536, 0.9922819536, 0.9922819536], degree=3))
            Line((50.6261785822, 33.3741808975), (50.6261785822, 34.1235491752))
        make_face()
        with BuildLine():
            Line((19.2922195872, 15.4203029754), (17.2922195872, 15.4203029754))
            Line((17.2922195872, 15.4203029754), (17.2922195872, 14.4203029754))
            Line((17.2922195872, 14.4203029754), (19.9144440108, 14.4203029754))
            ThreePointArc((19.9144440108, 14.4203029754), (19.9723558521, 14.9332157555), (20.1431754695, 15.4203029754))
            Line((20.1431754695, 15.4203029754), (19.2922195872, 15.4203029754))
        make_face()
        with BuildLine():
            Line((49.8755873878, 15.4203029754), (47.8761785822, 15.4203029754))
            Line((47.8761785822, 15.4203029754), (47.0252226998, 15.4203029754))
            ThreePointArc((47.0252226998, 15.4203029754), (47.1960423172, 14.9332157555), (47.2539541585, 14.4203029754))
            ThreePointArc((47.2539541585, 14.4203029754), (47.1960423172, 13.9073901952), (47.0252226998, 13.4203029754))
            Line((47.0252226998, 13.4203029754), (49.8755873878, 13.4203029754))
            Line((49.8755873878, 13.4203029754), (49.8755873878, 15.4203029754))
        make_face()
        with BuildLine():
            add(Edge.make_bspline(
                [(49.8755873878, 38.9486732266), (49.2099248299, 37.685610926), (48.955176546, 36.1546772336), (49.4175949717, 35.2024133246), (49.8755873878, 35.0193505084)],
                knots=[0, 0, 0, 0, 0.5644517657, 0.8656719041, 0.8656719041, 0.8656719041, 0.8656719041], degree=3))
            Line((49.8755873878, 35.0193505084), (49.8755873878, 38.9486732266))
        make_face()
        with BuildLine():
            Line((49.8755873878, 29.2984251238), (49.8755873878, 33.227747842))
            add(Edge.make_bspline(
                [(49.8755873878, 29.2984251238), (49.2099248299, 30.5614874244), (48.955176546, 32.0924211168), (49.4175949717, 33.0446850258), (49.8755873878, 33.227747842)],
                knots=[0, 0, 0, 0, 0.5644517657, 0.8656719041, 0.8656719041, 0.8656719041, 0.8656719041], degree=3))
        make_face()
        with BuildLine():
            add(Edge.make_bspline(
                [(49.8755873878, 33.227747842), (50.068092586, 33.3046935347), (50.3130851315, 33.3554408575), (50.6261785822, 33.3741808975)],
                knots=[0.8656719041, 0.8656719041, 0.8656719041, 0.8656719041, 0.9922819536, 0.9922819536, 0.9922819536, 0.9922819536], degree=3))
            Line((49.8755873878, 33.227747842), (49.8755873878, 29.2984251238))
            Line((49.8755873878, 29.2984251238), (49.8755873878, 15.4203029754))
            Line((49.8755873878, 15.4203029754), (49.8755873878, 13.4203029754))
            Line((49.8755873878, 13.4203029754), (49.8761785822, 13.4203029754))
            ThreePointArc((49.8761785822, 13.4203029754), (50.406508668, 13.6399728895), (50.6261785822, 14.1703029754))
            Line((50.6261785822, 14.1703029754), (50.6261785822, 32.0830467928))
            Line((50.6261785822, 32.0830467928), (50.5373619336, 32.0830467928))
            add(Edge.make_bspline(
                [(50.5373619336, 32.0830467928), (50.5078398965, 32.1441062274), (50.5501261495, 32.2070406889), (50.6261785822, 32.2748882106)],
                knots=[0, 0, 0, 0, 0.1783856354, 0.1783856354, 0.1783856354, 0.1783856354], degree=3))
            Line((50.6261785822, 32.2748882106), (50.6261785822, 33.3741808975))
        make_face()
        with BuildLine():
            Line((19.9144440108, 14.4203029754), (17.2922195872, 14.4203029754))
            Line((17.2922195872, 14.4203029754), (17.2922195872, 13.4203029754))
            Line((17.2922195872, 13.4203029754), (20.1431754695, 13.4203029754))
            ThreePointArc((20.1431754695, 13.4203029754), (19.9723558521, 13.9073901952), (19.9144440108, 14.4203029754))
        make_face()
        with BuildLine():
            Line((43.9536188964, 12.3486991719), (43.9536188964, 6.8150537134))
            Line((43.9536188964, 6.8150537134), (43.9536188964, 4.8150537134))
            Line((43.9536188964, 4.8150537134), (45.9536188964, 4.8150537134))
            Line((45.9536188964, 4.8150537134), (45.9536188964, 12.3486991719))
            ThreePointArc((45.9536188964, 12.3486991719), (44.9536188964, 12.1199677132), (43.9536188964, 12.3486991719))
        make_face()
        with BuildLine():
            Line((23.214779273, 4.8150537134), (23.214779273, 6.8150537134))
            Line((23.214779273, 6.8150537134), (23.214779273, 12.3486991719))
            ThreePointArc((23.214779273, 12.3486991719), (22.7276920531, 12.1778795545), (22.214779273, 12.1199677132))
            Line((22.214779273, 12.1199677132), (22.214779273, 4.8150537134))
            Line((22.214779273, 4.8150537134), (23.214779273, 4.8150537134))
        make_face()
        with BuildLine():
            ThreePointArc((24.5151145351, 14.4203029754), (22.7276920531, 16.6627263962), (20.1431754695, 15.4203029754))
            ThreePointArc((20.1431754695, 15.4203029754), (19.9723558521, 14.9332157555), (19.9144440108, 14.4203029754))
            ThreePointArc((19.9144440108, 14.4203029754), (19.9723558521, 13.9073901952), (20.1431754695, 13.4203029754))
            ThreePointArc((20.1431754695, 13.4203029754), (20.5881966101, 12.7937203125), (21.214779273, 12.3486991719))
            ThreePointArc((21.214779273, 12.3486991719), (21.7018664928, 12.1778795545), (22.214779273, 12.1199677132))
            ThreePointArc((22.214779273, 12.1199677132), (22.7276920531, 12.1778795545), (23.214779273, 12.3486991719))
            ThreePointArc((23.214779273, 12.3486991719), (24.1630961851, 13.1973542732), (24.5151145351, 14.4203029754))
        make_face()
        with Locations((22.214779273, 14.4203029754)):
            Circle(F1_R, mode=Mode.SUBTRACT)
        with BuildLine():
            ThreePointArc((47.2539541585, 14.4203029754), (47.1960423172, 14.9332157555), (47.0252226998, 15.4203029754))
            ThreePointArc((47.0252226998, 15.4203029754), (43.3270362335, 16.0468856383), (43.9536188964, 12.3486991719))
            ThreePointArc((43.9536188964, 12.3486991719), (44.9536188964, 12.1199677132), (45.9536188964, 12.3486991719))
            ThreePointArc((45.9536188964, 12.3486991719), (46.5802015593, 12.7937203125), (47.0252226998, 13.4203029754))
            ThreePointArc((47.0252226998, 13.4203029754), (47.1960423172, 13.9073901952), (47.2539541585, 14.4203029754))
        make_face()
        with Locations((44.9536188964, 14.4203029754)):
            Circle(F1_R, mode=Mode.SUBTRACT)
        with BuildLine():
            Line((21.214779273, 4.8150537134), (22.214779273, 4.8150537134))
            Line((22.214779273, 4.8150537134), (22.214779273, 12.1199677132))
            ThreePointArc((22.214779273, 12.1199677132), (21.7018664928, 12.1778795545), (21.214779273, 12.3486991719))
            Line((21.214779273, 12.3486991719), (21.214779273, 4.8150537134))
        make_face()
    extrude(amount=F2_DEPTH)

    # F1 (on Top) → F3 (join)
    with BuildSketch(Plane.XY):
        with BuildLine():
            ThreePointArc((21.214779273, 55.8983991785), (20.5881966101, 55.4533780379), (20.1431754695, 54.826795375))
            ThreePointArc((20.1431754695, 54.826795375), (19.9144440108, 53.826795375), (20.1431754695, 52.826795375))
            ThreePointArc((20.1431754695, 52.826795375), (22.7276920531, 51.5843719542), (24.5151145351, 53.826795375))
            ThreePointArc((24.5151145351, 53.826795375), (24.1630961851, 55.0497440772), (23.214779273, 55.8983991785))
            ThreePointArc((23.214779273, 55.8983991785), (22.214779273, 56.1271306372), (21.214779273, 55.8983991785))
        make_face()
        with Locations((22.214779273, 53.826795375)):
            Circle(F1_R, mode=Mode.SUBTRACT)
        with BuildLine():
            Line((17.2922195872, 33.2279874763), (17.2922195872, 34.1235491752))
            Line((17.2922195872, 34.1235491752), (16.5422195872, 34.1235491752))
            Line((16.5422195872, 34.1235491752), (16.5422195872, 33.3741808849))
            add(Edge.make_bspline(
                [(17.2922195872, 33.2279874763), (17.0997972989, 33.304798867), (16.8549828965, 33.3554604753), (16.5422195872, 33.3741808849)],
                knots=[0.8658058325, 0.8658058325, 0.8658058325, 0.8658058325, 0.9922819661, 0.9922819661, 0.9922819661, 0.9922819661], degree=3))
        make_face()
        with BuildLine():
            ThreePointArc((47.2539541585, 14.4203029754), (47.1960423172, 14.9332157555), (47.0252226998, 15.4203029754))
            ThreePointArc((47.0252226998, 15.4203029754), (43.3270362335, 16.0468856383), (43.9536188964, 12.3486991719))
            ThreePointArc((43.9536188964, 12.3486991719), (44.9536188964, 12.1199677132), (45.9536188964, 12.3486991719))
            ThreePointArc((45.9536188964, 12.3486991719), (46.5802015593, 12.7937203125), (47.0252226998, 13.4203029754))
            ThreePointArc((47.0252226998, 13.4203029754), (47.1960423172, 13.9073901952), (47.2539541585, 14.4203029754))
        make_face()
        with Locations((44.9536188964, 14.4203029754)):
            Circle(F1_R, mode=Mode.SUBTRACT)
        with Locations((22.214779273, 14.4203029754)):
            Circle(F1_R)
        with Locations((22.214779273, 14.4203029754)):
            Circle(F1_R_2, mode=Mode.SUBTRACT)
        with Locations((22.214779273, 53.826795375)):
            Circle(F1_R)
        with Locations((22.214779273, 53.826795375)):
            Circle(F1_R_2, mode=Mode.SUBTRACT)
        with Locations((44.9536188964, 14.4203029754)):
            Circle(F1_R)
        with Locations((44.9536188964, 14.4203029754)):
            Circle(F1_R_2, mode=Mode.SUBTRACT)
        with Locations((44.9536188964, 53.826795375)):
            Circle(F1_R)
        with Locations((44.9536188964, 53.826795375)):
            Circle(F1_R_2, mode=Mode.SUBTRACT)
    extrude(amount=F3_DEPTH)


solid = f2.part
